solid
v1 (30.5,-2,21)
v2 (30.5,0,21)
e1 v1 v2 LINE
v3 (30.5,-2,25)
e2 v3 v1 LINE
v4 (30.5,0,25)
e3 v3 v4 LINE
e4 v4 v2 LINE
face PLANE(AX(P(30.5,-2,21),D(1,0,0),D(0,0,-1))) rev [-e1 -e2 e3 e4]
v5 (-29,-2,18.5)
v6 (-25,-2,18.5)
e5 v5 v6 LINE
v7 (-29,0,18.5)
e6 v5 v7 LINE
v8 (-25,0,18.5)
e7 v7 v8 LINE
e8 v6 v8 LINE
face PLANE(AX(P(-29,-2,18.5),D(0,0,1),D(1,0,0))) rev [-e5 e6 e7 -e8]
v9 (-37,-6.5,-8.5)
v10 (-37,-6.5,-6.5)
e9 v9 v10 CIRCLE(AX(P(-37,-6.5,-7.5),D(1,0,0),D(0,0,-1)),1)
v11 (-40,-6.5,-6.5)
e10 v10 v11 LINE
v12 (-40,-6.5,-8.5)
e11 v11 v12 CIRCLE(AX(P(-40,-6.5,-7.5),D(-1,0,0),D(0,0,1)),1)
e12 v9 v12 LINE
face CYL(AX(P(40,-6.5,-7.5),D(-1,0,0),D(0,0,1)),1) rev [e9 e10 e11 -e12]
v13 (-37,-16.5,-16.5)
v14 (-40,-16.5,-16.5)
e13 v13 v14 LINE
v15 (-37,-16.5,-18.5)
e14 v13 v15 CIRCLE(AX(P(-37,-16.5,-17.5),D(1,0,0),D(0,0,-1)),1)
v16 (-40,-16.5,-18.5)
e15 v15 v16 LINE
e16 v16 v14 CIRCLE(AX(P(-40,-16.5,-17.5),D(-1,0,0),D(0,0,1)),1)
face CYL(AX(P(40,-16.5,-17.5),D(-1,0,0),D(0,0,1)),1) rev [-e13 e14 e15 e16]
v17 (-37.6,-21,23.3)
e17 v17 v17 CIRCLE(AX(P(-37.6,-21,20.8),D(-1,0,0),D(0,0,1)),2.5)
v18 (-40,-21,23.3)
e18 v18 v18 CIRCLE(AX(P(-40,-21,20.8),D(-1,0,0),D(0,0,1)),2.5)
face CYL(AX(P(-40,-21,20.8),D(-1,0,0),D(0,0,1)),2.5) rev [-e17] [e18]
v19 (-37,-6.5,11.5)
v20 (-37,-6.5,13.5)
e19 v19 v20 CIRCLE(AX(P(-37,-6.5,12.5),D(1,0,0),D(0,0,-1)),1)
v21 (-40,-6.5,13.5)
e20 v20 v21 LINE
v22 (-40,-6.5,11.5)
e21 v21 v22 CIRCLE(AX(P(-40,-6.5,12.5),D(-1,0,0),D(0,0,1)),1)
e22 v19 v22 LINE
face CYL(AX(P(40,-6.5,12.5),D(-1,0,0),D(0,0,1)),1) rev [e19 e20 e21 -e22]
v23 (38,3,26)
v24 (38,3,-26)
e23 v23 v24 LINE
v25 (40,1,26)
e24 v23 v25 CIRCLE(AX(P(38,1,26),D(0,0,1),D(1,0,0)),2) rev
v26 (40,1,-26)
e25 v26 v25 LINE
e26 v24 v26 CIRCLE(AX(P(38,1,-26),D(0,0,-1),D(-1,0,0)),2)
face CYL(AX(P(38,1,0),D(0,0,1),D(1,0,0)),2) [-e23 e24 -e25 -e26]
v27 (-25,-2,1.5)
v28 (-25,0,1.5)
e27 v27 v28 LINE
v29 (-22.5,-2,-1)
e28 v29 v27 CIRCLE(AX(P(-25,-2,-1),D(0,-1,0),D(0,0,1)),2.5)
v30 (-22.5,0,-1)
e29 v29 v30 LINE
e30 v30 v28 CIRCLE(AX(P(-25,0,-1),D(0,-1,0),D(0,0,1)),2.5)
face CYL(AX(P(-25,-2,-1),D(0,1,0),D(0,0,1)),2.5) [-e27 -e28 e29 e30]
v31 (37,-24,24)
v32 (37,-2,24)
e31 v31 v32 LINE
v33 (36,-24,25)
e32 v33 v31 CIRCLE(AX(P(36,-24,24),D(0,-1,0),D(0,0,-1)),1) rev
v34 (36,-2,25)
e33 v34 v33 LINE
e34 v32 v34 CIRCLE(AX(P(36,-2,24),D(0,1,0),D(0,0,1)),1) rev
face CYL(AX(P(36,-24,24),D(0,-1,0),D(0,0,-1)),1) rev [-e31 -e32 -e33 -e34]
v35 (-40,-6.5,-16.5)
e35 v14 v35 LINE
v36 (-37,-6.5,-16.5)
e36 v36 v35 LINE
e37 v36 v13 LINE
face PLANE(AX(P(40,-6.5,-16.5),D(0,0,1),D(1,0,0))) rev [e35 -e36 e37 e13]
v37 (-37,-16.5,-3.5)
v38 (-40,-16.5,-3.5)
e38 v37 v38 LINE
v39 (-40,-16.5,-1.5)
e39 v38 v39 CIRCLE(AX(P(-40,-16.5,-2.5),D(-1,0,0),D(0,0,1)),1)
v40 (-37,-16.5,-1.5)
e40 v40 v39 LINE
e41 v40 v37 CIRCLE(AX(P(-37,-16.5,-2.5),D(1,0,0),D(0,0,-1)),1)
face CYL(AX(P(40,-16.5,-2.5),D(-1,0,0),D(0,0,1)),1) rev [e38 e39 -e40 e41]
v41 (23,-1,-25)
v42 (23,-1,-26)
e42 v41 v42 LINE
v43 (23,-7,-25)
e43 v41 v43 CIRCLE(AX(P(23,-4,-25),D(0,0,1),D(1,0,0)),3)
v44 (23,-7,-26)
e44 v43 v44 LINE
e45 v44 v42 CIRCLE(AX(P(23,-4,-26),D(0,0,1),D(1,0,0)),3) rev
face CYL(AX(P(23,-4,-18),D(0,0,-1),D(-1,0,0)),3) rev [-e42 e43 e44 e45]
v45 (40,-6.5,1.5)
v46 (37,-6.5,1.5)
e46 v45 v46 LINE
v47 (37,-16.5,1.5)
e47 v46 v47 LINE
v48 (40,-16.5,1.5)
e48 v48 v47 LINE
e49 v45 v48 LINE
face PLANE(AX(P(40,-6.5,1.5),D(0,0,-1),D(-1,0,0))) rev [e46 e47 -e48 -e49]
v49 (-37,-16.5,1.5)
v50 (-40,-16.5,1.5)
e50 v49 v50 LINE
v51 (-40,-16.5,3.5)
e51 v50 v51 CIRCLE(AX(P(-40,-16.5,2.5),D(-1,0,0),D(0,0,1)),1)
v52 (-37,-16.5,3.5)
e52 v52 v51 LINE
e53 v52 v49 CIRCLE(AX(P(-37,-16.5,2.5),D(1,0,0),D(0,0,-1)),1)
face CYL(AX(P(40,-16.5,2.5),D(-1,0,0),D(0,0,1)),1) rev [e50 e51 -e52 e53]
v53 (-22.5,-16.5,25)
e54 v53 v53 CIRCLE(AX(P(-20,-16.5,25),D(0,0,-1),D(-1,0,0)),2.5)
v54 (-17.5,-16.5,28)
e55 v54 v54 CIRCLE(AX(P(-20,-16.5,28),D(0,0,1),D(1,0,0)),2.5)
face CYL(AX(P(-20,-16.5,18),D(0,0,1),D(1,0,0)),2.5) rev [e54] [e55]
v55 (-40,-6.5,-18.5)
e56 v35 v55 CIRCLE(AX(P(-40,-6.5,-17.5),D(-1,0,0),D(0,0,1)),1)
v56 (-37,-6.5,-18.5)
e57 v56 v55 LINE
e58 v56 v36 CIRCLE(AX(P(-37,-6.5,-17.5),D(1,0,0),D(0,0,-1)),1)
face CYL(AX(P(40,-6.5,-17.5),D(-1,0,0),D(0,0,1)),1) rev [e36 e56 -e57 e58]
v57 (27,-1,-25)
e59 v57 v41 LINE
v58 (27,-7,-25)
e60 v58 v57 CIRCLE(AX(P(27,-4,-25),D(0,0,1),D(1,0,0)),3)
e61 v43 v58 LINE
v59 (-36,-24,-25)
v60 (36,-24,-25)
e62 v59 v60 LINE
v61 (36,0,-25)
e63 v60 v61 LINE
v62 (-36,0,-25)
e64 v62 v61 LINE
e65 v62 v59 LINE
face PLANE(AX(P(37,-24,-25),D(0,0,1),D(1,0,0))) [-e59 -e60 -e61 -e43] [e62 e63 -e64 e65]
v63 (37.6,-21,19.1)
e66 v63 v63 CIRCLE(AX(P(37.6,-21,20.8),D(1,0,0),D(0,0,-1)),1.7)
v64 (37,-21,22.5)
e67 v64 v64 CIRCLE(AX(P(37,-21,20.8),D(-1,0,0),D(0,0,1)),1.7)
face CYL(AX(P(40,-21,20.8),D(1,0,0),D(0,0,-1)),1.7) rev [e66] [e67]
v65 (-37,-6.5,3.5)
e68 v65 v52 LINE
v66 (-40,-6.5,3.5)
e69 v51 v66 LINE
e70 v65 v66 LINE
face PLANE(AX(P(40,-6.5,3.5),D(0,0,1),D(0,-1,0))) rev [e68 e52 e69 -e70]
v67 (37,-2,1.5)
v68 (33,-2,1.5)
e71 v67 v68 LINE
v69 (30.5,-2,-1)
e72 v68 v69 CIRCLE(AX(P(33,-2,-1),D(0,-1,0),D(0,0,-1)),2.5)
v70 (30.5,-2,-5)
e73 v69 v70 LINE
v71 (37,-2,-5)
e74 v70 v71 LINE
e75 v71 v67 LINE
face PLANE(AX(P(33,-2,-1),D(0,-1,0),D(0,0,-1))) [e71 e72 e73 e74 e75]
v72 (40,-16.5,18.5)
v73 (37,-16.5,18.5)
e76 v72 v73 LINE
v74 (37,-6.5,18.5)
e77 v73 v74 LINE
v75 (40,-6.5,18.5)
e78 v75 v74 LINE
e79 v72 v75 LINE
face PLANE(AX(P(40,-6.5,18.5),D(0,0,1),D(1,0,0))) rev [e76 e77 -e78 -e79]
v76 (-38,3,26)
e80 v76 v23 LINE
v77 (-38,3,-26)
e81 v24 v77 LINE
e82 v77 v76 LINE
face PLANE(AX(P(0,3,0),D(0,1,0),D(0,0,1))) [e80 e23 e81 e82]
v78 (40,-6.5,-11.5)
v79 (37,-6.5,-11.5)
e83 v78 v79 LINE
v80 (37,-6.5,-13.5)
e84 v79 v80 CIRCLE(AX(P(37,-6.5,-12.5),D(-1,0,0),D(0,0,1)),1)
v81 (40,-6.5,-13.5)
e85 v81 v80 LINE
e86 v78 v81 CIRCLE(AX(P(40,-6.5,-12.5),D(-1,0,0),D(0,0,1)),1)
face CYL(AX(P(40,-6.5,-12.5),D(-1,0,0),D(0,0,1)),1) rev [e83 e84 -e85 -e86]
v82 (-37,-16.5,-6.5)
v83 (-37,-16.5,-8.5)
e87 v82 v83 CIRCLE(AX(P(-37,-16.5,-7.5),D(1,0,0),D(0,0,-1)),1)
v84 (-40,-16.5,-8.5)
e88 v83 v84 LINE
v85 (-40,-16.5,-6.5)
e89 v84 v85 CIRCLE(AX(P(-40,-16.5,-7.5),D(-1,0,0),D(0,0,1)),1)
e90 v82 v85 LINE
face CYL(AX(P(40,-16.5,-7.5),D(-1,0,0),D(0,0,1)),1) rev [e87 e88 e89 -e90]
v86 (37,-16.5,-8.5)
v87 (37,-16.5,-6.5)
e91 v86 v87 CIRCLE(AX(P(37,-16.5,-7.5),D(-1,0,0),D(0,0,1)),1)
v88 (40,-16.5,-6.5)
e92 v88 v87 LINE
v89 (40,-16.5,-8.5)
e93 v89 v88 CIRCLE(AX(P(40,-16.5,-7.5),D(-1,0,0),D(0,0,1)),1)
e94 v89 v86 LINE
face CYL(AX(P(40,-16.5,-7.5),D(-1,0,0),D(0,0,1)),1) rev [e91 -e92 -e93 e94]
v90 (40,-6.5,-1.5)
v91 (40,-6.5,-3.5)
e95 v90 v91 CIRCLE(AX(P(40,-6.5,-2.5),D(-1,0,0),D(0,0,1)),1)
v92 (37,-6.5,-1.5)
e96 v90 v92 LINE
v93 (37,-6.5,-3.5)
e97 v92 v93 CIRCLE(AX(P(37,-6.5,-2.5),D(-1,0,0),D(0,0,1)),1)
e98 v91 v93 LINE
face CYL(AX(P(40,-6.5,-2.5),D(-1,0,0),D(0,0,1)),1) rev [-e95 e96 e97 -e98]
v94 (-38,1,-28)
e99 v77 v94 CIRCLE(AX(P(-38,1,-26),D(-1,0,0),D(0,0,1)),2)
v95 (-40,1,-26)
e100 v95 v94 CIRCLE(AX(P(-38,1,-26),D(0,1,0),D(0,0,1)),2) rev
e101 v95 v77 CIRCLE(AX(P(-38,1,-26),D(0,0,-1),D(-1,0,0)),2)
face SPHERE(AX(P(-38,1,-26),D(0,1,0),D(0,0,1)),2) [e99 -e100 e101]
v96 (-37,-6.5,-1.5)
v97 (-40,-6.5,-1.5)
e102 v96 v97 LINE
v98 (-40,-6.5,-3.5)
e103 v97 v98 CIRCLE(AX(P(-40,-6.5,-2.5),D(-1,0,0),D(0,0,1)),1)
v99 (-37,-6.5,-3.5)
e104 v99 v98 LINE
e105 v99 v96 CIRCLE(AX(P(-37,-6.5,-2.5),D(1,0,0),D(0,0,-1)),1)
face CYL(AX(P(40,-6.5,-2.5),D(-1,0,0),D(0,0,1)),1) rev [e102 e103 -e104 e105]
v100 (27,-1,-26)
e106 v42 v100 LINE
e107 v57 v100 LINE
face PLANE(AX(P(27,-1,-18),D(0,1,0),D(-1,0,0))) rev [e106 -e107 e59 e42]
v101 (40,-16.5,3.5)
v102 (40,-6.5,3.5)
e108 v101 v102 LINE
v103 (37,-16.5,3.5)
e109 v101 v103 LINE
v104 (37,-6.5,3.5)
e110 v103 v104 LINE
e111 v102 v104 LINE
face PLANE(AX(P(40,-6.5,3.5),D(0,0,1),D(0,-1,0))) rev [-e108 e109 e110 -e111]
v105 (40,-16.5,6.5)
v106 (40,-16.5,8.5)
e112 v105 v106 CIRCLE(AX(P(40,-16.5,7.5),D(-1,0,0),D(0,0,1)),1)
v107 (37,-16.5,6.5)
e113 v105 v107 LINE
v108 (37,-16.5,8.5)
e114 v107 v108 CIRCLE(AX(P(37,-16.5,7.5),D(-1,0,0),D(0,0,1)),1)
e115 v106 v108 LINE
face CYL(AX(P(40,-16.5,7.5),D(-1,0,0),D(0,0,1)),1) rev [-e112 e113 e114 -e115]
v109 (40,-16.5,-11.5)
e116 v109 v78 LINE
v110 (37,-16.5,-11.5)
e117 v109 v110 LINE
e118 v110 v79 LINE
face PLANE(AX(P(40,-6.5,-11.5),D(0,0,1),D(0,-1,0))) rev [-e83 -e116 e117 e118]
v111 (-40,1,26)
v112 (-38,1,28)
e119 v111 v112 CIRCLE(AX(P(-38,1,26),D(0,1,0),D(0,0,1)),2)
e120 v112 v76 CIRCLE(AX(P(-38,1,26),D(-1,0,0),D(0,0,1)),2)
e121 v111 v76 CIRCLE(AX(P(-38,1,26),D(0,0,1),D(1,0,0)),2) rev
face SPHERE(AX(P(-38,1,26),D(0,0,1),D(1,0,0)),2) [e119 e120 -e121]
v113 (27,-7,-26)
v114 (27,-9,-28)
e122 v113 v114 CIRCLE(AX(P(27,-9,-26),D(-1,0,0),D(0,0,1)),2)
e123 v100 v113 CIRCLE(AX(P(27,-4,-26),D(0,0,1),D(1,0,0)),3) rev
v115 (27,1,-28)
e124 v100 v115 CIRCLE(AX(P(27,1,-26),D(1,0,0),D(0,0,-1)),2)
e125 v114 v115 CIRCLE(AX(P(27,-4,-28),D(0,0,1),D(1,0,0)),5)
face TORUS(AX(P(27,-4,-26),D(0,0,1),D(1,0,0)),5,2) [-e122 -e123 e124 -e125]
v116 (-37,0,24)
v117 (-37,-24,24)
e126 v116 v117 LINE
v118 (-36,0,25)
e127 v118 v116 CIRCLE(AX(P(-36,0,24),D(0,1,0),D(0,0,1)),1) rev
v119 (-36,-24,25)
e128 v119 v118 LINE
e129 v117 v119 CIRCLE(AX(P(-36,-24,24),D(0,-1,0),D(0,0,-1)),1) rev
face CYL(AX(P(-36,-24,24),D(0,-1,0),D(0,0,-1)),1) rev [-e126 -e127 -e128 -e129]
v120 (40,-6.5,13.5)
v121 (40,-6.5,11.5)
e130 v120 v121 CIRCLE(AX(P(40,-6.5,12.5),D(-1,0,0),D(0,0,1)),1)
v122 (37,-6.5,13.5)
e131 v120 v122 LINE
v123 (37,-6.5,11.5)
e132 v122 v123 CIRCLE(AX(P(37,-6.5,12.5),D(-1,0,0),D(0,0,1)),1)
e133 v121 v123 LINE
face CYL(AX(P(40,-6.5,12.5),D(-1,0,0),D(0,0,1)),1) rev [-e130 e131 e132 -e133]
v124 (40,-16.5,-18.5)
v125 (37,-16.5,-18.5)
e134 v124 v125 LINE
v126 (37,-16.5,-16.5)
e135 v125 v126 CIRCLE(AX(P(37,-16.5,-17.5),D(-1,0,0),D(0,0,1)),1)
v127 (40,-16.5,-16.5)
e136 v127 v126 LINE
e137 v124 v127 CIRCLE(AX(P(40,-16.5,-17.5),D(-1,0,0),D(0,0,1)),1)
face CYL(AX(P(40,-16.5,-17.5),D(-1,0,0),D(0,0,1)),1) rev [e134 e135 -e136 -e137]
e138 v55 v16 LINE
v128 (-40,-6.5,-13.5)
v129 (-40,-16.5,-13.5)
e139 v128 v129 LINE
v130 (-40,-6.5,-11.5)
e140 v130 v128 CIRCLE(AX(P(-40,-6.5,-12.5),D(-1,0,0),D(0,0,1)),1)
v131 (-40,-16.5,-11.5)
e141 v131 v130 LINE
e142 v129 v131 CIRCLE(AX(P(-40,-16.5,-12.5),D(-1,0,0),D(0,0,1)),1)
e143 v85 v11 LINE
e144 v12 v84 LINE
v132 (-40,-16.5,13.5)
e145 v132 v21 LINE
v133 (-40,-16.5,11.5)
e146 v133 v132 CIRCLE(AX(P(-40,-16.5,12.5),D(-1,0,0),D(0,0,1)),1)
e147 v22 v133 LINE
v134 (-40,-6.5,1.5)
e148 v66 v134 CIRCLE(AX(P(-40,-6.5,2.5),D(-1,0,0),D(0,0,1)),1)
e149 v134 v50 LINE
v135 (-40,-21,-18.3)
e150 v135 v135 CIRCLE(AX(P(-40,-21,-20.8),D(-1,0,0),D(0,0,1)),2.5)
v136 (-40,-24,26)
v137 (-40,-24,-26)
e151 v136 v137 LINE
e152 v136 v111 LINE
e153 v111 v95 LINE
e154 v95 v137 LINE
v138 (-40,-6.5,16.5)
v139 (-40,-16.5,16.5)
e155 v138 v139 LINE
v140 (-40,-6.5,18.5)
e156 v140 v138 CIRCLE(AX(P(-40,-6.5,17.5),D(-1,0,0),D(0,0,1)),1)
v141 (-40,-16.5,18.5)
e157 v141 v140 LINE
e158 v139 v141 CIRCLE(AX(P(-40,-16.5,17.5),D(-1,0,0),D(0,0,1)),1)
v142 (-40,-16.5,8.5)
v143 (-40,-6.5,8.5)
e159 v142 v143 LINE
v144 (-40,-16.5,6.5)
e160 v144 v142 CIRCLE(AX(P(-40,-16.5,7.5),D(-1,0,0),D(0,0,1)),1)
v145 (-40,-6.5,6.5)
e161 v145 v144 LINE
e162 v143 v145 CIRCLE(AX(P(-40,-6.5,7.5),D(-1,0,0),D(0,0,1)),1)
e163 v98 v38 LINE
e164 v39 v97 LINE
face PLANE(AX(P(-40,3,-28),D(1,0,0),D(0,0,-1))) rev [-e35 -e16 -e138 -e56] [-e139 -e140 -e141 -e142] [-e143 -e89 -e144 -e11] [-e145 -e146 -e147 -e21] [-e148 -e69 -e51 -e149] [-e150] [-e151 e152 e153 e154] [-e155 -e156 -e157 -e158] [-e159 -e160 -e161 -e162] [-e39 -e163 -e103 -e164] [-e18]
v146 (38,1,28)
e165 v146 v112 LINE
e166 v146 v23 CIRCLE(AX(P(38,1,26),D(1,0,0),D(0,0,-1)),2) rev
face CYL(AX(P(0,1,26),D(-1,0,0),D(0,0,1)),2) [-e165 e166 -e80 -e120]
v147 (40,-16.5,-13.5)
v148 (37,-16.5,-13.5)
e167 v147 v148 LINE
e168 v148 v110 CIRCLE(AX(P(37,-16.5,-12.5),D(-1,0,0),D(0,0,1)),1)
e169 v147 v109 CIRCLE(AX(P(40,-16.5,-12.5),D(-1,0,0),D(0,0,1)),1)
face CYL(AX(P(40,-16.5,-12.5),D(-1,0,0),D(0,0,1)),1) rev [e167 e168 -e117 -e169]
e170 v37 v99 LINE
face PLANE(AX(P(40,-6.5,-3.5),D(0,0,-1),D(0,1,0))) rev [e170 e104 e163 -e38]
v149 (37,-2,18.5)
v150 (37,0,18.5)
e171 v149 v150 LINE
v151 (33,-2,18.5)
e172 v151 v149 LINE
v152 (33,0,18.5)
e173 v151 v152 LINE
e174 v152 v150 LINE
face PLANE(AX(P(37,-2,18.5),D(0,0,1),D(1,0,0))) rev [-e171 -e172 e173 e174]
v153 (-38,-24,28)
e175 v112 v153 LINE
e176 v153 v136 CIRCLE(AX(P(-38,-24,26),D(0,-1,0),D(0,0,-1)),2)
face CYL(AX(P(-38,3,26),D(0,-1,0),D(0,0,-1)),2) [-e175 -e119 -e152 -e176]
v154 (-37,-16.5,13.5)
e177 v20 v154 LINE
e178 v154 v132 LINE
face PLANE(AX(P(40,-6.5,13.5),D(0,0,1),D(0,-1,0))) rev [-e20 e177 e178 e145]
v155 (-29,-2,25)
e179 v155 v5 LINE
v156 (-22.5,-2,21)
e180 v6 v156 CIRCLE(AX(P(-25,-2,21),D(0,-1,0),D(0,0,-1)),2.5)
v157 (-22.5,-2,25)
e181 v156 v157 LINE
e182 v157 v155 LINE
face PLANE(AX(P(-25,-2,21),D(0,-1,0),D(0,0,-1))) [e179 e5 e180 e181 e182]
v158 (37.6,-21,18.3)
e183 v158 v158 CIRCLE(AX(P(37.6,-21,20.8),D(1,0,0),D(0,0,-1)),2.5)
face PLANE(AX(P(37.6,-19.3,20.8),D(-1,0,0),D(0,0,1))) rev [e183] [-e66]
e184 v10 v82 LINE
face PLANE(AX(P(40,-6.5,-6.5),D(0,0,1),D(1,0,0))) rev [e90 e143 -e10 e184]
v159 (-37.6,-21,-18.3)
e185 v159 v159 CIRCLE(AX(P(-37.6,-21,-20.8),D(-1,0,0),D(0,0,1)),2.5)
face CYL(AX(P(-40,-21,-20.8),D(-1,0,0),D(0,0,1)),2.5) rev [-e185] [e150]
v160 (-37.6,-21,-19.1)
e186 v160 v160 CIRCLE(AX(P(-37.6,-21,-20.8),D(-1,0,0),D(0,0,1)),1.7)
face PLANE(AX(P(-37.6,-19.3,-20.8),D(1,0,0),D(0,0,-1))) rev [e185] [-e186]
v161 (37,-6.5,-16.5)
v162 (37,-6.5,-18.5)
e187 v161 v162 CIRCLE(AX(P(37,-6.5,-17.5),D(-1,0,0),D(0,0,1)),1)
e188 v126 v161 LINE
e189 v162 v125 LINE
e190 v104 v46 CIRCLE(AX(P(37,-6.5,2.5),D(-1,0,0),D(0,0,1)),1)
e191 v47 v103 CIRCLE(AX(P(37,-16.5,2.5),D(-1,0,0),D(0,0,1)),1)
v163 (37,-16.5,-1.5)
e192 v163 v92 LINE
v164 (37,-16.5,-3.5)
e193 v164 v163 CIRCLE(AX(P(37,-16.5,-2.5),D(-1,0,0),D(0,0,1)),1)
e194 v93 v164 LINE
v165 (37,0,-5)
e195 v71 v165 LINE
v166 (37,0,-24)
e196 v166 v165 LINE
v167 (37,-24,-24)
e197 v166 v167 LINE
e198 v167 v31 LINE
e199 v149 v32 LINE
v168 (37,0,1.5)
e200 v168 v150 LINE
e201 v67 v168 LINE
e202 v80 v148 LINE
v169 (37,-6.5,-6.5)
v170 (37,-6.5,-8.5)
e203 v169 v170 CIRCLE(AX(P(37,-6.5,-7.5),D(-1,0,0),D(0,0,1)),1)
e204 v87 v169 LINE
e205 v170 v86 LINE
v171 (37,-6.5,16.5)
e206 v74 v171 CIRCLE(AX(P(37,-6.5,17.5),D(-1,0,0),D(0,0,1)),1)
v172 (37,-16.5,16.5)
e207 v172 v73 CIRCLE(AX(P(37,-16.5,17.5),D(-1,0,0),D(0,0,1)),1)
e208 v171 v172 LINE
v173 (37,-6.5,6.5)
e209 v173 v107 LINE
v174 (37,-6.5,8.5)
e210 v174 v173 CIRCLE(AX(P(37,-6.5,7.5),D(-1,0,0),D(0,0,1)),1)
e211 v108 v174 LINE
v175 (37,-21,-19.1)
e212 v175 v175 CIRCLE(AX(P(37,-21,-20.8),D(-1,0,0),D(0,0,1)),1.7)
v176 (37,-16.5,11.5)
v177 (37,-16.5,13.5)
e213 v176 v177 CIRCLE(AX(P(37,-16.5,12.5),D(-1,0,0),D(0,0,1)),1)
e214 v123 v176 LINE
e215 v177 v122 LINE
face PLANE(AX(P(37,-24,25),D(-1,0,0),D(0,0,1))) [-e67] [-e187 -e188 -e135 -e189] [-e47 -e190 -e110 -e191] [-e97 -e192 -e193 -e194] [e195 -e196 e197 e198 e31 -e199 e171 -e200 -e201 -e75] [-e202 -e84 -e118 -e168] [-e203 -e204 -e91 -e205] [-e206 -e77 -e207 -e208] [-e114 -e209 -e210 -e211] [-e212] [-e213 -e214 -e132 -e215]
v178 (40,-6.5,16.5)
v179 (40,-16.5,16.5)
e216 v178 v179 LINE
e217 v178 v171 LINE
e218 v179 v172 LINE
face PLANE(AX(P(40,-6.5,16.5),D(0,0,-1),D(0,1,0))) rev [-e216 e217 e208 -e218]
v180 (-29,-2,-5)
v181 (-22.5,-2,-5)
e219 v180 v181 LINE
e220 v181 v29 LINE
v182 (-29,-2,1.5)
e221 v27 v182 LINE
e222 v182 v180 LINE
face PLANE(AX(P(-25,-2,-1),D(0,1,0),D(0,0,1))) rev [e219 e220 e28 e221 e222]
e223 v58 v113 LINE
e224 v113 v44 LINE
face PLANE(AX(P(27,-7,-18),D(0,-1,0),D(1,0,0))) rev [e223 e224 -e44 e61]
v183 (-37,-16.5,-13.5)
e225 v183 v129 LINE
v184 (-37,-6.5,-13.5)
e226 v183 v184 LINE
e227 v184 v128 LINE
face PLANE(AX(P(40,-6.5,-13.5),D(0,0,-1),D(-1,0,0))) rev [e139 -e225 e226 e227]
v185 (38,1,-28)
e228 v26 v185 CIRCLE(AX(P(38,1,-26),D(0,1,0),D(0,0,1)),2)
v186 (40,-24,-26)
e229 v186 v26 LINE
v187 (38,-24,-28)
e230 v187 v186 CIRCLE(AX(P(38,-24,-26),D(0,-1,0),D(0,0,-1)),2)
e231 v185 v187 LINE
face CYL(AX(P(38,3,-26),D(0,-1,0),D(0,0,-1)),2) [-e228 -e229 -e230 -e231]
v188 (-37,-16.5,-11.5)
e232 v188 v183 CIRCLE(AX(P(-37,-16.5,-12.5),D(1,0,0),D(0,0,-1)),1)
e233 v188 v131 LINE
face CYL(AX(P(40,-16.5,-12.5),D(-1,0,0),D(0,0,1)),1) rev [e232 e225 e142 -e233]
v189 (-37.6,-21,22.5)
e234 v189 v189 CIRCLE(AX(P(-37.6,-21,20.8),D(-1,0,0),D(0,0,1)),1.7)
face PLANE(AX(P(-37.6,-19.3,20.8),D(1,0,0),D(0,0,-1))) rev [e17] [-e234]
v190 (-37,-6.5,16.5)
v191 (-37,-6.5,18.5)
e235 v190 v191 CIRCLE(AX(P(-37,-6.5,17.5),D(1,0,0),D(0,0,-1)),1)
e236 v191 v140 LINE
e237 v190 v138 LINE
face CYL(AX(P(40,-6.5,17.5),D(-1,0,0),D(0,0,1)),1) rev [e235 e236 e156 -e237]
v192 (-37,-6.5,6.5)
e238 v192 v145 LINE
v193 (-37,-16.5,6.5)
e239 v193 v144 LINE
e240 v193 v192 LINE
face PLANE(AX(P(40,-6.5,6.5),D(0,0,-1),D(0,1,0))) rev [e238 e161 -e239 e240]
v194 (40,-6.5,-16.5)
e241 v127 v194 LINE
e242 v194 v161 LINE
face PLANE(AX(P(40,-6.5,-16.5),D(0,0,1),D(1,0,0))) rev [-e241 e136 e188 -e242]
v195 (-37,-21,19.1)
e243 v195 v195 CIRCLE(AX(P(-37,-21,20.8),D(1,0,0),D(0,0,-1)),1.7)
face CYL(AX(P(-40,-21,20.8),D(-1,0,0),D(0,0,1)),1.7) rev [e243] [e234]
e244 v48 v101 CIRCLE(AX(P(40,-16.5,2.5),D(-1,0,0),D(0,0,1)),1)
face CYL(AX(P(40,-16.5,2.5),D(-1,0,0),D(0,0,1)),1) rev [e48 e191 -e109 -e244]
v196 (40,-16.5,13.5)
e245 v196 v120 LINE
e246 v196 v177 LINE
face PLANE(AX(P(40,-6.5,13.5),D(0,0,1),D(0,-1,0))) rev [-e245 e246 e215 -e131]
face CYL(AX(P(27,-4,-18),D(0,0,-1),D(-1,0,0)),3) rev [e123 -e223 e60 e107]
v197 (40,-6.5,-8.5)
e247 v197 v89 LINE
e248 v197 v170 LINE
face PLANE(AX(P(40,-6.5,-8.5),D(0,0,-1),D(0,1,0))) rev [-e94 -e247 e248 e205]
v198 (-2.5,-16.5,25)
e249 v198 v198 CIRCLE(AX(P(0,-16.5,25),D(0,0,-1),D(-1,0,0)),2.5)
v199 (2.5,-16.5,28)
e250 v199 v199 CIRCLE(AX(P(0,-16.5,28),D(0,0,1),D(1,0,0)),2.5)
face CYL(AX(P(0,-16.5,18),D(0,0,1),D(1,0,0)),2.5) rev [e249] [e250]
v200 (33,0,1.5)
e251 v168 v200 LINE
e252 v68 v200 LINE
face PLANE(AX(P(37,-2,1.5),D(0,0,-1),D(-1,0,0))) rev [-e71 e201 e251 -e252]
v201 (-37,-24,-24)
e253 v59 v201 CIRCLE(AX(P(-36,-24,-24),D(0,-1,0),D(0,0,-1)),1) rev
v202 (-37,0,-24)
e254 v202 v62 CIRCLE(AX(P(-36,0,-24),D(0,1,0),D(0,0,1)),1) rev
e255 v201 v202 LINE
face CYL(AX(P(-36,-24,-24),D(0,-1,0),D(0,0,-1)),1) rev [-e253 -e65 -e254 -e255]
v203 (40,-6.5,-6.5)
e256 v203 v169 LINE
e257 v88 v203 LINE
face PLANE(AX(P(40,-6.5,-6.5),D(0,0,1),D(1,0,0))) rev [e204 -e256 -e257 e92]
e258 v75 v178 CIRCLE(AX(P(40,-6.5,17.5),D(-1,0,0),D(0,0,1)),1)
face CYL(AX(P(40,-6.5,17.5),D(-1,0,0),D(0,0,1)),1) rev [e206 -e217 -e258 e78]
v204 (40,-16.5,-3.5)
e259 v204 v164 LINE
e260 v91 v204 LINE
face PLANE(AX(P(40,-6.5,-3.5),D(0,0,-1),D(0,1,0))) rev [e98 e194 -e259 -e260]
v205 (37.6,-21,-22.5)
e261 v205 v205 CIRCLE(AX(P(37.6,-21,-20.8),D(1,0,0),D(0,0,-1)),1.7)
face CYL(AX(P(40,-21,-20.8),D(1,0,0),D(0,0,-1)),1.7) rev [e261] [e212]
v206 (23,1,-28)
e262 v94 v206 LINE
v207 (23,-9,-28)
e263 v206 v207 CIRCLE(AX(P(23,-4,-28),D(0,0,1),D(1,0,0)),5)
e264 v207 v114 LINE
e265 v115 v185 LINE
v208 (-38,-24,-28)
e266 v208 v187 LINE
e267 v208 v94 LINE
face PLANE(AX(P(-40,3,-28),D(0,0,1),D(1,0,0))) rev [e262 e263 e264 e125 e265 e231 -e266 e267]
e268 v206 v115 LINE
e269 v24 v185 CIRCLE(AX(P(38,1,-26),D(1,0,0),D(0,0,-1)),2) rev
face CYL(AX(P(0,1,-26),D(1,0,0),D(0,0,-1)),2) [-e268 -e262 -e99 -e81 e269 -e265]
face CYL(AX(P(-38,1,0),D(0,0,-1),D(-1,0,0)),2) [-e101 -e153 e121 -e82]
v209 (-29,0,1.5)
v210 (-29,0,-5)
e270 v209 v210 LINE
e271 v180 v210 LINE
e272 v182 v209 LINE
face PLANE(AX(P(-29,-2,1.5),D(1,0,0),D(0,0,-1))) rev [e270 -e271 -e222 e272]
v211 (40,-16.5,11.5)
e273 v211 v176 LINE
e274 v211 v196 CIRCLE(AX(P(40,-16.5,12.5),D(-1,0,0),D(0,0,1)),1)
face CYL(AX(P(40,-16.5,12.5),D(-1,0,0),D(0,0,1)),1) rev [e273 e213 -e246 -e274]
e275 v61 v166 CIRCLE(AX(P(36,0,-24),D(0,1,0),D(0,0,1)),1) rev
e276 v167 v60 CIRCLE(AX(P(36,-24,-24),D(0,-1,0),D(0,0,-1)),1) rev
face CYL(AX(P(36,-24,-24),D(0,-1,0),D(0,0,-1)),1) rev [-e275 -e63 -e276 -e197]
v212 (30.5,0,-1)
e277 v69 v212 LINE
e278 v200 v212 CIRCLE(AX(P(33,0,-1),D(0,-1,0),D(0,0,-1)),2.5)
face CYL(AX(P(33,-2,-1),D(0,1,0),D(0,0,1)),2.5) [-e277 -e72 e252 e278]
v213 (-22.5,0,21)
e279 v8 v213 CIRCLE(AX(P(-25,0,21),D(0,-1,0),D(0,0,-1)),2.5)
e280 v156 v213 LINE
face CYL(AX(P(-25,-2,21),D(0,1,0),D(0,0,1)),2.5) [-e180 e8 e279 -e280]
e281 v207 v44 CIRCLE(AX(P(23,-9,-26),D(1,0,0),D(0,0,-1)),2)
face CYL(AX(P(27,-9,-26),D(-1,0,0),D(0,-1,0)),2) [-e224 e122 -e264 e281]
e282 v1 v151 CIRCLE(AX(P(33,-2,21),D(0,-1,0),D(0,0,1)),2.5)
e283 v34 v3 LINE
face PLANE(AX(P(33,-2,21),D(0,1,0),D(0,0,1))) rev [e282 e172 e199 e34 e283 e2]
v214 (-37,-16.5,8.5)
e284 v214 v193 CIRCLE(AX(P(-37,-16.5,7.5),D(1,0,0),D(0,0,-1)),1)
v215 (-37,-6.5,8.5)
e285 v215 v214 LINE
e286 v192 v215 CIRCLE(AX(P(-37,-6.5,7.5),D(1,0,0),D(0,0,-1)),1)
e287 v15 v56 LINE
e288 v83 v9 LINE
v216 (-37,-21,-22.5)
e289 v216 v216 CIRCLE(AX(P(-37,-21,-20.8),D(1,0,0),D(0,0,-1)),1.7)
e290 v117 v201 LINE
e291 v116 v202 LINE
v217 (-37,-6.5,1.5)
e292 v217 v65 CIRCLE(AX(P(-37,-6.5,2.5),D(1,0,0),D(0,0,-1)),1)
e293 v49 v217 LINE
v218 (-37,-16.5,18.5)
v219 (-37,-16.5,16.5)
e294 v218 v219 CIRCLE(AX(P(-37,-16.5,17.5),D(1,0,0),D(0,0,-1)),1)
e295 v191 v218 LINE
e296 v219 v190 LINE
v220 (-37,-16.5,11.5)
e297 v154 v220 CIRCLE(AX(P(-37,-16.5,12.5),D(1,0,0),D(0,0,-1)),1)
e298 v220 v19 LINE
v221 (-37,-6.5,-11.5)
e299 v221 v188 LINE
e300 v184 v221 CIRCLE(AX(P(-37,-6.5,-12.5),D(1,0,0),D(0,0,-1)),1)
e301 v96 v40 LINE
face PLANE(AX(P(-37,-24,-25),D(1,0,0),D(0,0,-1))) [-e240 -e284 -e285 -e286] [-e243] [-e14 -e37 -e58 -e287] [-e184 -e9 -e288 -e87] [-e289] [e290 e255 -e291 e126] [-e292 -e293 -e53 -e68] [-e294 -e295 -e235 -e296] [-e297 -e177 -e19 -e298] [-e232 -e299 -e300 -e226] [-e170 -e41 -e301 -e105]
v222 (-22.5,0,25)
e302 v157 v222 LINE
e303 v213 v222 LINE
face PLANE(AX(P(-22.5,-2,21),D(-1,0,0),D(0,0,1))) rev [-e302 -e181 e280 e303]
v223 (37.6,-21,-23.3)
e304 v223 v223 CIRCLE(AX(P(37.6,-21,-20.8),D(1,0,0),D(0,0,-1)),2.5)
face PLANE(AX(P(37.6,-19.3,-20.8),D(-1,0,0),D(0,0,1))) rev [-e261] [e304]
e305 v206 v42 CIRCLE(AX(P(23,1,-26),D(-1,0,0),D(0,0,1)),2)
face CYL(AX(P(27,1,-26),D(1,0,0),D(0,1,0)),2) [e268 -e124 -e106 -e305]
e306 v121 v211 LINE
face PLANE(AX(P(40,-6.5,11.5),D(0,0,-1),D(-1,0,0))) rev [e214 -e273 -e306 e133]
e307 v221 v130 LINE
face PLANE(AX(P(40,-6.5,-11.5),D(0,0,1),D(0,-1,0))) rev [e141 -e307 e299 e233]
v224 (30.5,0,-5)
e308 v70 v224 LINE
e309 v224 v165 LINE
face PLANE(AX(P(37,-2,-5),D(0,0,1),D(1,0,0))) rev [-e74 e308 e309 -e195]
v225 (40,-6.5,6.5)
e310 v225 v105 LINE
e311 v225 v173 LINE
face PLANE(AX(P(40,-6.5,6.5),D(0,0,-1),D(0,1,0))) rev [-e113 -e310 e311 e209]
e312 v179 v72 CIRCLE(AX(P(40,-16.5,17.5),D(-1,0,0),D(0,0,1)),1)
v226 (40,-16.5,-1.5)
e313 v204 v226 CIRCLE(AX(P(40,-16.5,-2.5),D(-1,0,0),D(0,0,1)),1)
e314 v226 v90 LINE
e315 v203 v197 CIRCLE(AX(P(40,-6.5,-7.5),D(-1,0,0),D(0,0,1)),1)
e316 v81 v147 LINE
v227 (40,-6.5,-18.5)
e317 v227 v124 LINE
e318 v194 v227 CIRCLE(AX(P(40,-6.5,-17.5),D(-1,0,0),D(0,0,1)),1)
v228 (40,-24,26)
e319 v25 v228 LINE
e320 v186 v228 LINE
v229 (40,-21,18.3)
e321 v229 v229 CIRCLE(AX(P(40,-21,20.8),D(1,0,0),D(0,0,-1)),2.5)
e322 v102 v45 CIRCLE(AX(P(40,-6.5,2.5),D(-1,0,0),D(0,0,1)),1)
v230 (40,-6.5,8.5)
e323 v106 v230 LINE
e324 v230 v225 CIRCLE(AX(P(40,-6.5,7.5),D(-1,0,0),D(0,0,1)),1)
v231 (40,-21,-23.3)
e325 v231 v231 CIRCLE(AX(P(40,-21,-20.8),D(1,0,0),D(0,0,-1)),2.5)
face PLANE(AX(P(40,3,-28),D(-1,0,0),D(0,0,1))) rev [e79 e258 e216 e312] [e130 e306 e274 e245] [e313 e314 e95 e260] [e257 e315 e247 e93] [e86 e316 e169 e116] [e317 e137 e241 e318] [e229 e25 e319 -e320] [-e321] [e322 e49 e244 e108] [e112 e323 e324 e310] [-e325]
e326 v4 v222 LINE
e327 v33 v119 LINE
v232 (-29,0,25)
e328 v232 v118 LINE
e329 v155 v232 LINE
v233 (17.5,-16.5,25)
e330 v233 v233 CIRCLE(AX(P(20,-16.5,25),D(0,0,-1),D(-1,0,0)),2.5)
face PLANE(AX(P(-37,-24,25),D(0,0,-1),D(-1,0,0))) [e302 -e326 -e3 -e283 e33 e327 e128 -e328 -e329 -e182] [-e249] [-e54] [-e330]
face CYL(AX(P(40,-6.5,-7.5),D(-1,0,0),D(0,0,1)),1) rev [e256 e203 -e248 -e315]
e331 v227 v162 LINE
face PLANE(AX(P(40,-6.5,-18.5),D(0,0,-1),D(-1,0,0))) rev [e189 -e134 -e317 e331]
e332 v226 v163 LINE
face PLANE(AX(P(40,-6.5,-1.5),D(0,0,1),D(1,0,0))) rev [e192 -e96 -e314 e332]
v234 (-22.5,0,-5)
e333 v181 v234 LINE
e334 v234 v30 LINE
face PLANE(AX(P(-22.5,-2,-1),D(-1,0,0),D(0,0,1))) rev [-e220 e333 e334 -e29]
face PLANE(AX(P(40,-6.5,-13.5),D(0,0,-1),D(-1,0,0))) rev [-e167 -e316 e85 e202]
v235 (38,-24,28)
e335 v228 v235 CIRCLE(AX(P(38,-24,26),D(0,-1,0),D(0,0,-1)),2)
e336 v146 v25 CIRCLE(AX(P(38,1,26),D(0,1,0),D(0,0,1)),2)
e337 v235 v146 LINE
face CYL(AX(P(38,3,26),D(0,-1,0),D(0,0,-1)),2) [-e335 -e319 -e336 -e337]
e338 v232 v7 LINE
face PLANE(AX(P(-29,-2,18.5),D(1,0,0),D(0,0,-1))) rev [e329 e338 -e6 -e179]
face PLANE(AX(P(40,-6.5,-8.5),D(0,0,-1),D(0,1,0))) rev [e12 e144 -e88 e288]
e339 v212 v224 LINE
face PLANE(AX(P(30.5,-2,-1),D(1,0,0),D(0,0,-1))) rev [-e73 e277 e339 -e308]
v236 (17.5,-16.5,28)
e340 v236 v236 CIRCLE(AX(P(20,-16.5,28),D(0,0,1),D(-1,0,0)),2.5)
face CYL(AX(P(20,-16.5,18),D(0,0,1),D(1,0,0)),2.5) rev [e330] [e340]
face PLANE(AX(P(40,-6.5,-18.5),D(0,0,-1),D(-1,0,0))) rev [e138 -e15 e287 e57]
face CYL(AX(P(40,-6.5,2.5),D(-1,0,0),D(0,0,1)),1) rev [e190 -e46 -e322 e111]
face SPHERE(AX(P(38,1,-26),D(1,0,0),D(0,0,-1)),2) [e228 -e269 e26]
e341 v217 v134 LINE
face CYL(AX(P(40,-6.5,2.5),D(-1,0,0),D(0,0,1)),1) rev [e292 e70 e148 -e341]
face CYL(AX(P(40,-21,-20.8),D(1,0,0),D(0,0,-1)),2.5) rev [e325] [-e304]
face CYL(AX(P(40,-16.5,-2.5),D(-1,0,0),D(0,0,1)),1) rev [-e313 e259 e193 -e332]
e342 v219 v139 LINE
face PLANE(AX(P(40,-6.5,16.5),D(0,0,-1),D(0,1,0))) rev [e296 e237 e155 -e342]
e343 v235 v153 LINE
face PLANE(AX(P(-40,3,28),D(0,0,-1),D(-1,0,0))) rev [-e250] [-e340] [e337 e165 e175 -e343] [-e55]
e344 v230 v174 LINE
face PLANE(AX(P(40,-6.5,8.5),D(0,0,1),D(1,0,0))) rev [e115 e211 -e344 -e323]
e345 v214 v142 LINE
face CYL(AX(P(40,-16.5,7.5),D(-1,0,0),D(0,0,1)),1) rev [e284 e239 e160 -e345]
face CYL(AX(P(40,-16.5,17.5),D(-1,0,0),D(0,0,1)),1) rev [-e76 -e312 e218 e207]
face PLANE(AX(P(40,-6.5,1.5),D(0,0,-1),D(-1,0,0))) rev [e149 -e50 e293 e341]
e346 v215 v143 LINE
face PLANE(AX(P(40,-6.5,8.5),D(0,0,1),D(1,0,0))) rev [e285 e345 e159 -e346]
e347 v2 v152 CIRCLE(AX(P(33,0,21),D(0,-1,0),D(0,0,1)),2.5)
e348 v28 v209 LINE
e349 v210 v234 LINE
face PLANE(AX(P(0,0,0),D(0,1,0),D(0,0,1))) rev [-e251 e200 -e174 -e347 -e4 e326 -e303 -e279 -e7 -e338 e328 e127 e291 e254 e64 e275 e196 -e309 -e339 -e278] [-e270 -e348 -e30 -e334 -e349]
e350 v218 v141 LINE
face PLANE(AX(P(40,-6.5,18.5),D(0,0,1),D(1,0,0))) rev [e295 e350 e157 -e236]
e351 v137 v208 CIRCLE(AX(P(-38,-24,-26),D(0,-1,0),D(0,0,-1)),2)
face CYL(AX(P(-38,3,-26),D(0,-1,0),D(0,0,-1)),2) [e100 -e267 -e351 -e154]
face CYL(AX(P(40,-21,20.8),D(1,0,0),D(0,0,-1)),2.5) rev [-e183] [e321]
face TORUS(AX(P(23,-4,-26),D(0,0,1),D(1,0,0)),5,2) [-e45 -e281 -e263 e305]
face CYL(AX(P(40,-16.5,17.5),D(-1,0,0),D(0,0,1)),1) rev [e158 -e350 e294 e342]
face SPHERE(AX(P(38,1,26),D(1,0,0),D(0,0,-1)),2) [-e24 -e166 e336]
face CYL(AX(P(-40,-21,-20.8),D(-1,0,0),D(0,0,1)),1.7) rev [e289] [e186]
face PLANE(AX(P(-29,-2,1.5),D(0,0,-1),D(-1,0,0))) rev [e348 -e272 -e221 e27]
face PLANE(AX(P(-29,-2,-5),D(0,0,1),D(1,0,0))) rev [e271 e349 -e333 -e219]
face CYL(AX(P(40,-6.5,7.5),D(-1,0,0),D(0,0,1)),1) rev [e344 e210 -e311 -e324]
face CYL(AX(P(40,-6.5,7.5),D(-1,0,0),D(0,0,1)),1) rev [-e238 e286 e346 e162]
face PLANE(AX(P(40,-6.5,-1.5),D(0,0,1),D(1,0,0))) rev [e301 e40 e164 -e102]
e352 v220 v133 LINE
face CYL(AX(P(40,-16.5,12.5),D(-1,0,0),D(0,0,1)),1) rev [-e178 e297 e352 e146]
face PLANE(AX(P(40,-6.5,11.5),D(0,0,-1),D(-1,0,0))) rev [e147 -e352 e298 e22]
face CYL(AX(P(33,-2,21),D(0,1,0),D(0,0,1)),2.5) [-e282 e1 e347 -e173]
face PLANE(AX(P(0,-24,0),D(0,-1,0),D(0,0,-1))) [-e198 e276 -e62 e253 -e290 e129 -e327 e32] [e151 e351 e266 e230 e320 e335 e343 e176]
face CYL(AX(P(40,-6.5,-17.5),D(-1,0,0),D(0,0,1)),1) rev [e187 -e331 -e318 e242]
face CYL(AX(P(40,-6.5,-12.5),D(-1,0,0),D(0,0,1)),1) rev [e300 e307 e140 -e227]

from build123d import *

# Parameters (mm, degrees)
SKETCH1_W                                    = 80
SKETCH1_H                                    = 56
BOSS_EXTRUDE1_DEPTH                          = 3
SKETCH2_W                                    = 74
SKETCH2_H                                    = 50
BOSS_EXTRUDE2_DEPTH                          = 24
FILLET1_R                                    = 1
FILLET2_R                                    = 2
SKETCH3_R                                    = 2.5
CUT_EXTRUDE1_DEPTH                           = 10
CUT_EXTRUDE2_DEPTH                           = 10
FILLET3_R                                    = 2
BOSS_EXTRUDE3_DEPTH                          = 2
CUT_EXTRUDE3_DEPTH                           = 89.090862182
CBORE_FOR_M3_CROSS_RECESS_PAN_HEAD_S_2_COUNT = 2
CBORE_FOR_M3_CROSS_RECESS_PAN_HEAD_S_2_PITCH = 15.207328374
CBORE_FOR_M3_CROSS_RECESS_PAN_HEAD_S_3_COUNT = 2
CBORE_FOR_M3_CROSS_RECESS_PAN_HEAD_S_3_PITCH = 14.900401376


with BuildPart() as part:
    # Sketch1 → Boss-Extrude1 (new body)
    with BuildSketch(Plane(origin=(0, 0, 0), x_dir=(1, 0, 0), z_dir=(0, 1, 0))):
        Rectangle(SKETCH1_W, SKETCH1_H)
    extrude(amount=BOSS_EXTRUDE1_DEPTH)

    # Sketch2 → Boss-Extrude2 (add)
    with BuildSketch(Plane.XZ):
        Polygon((37, -28), (-37, -28), (-40, -28), (-40, 28), (40, 28), (40, -28), align=None)
        Rectangle(SKETCH2_W, SKETCH2_H, mode=Mode.SUBTRACT)
    extrude(amount=BOSS_EXTRUDE2_DEPTH)

    # Fillet1
    fillet1_edges = [part.edges().sort_by_distance(p)[0] for p in [
        (-37, -12, -25),
        (37, -12, -25),
        (37, -12, 25),
        (-37, -12, 25),
    ]]
    fillet(fillet1_edges, radius=FILLET1_R)

    # Fillet2
    fillet2_edges = [part.edges().sort_by_distance(p)[0] for p in [
        (-40, 3, 0),
        (0, 3, 28),
        (40, 3, 0),
        (40, -10.5, 28),
        (-40, -10.5, 28),
        (-40, -10.5, -28),
        (40, -10.5, -28),
        (0, 3, -28),
    ]]
    fillet(fillet2_edges, radius=FILLET2_R)

    # Sketch3 → Cut-Extrude1 (cut)
    with BuildSketch(Plane.XY.offset(28)):
        with Locations((0, -16.5)):
            Circle(SKETCH3_R)
        with Locations((-20, -16.5)):
            Circle(SKETCH3_R)
        with Locations(Location((20, -16.5, 0), (0, 0, 180))):
            Circle(SKETCH3_R)
    extrude(amount=-CUT_EXTRUDE1_DEPTH, mode=Mode.SUBTRACT)

    # Sketch5 → Cut-Extrude2 (cut)
    with BuildSketch(Plane(origin=(0, 0, -28), x_dir=(-1, 0, 0), z_dir=(0, 0, -1))):
        with BuildLine():
            Line((-27, -1), (-23, -1))
            ThreePointArc((-23, -1), (-20, -4), (-23, -7))
            Line((-23, -7), (-27, -7))
            ThreePointArc((-27, -7), (-30, -4), (-27, -1))
        make_face()
    extrude(amount=-CUT_EXTRUDE2_DEPTH, mode=Mode.SUBTRACT)

    # Fillet3
    fillet3_edges = [part.edges().sort_by_distance(p)[0] for p in [
        (30, -4, -28),
        (25, -7, -28),
        (20, -4, -28),
        (25, -1, -28),
    ]]
    fillet(fillet3_edges, radius=FILLET3_R - 0.0001)  # a hair under: the kernel refuses the full size

    # Sketch6 → Boss-Extrude3 (add)
    with BuildSketch(Plane.XZ):
        with BuildLine():
            Line((37, 18.5), (33, 18.5))
            ThreePointArc((33, 18.5), (31.232233047, 19.232233047), (30.5, 21))
            Line((30.5, 21), (30.5, 25))
            Line((30.5, 25), (37, 25))
            Line((37, 25), (37, 18.5))
        make_face()
        with BuildLine():
            Line((37, -5), (30.5, -5))
            Line((30.5, -5), (30.5, -1))
            ThreePointArc((30.5, -1), (31.232233047, 0.767766953), (33, 1.5))
            Line((33, 1.5), (37, 1.5))
            Line((37, 1.5), (37, -5))
        make_face()
        with BuildLine():
            Line((-29, 1.5), (-25, 1.5))
            ThreePointArc((-25, 1.5), (-23.232233047, 0.767766953), (-22.5, -1))
            Line((-22.5, -1), (-22.5, -5))
            Line((-22.5, -5), (-29, -5))
            Line((-29, -5), (-29, 1.5))
        make_face()
        with BuildLine():
            Line((-29, 25), (-22.5, 25))
            Line((-22.5, 25), (-22.5, 21))
            ThreePointArc((-22.5, 21), (-23.232233047, 19.232233047), (-25, 18.5))
            Line((-25, 18.5), (-29, 18.5))
            Line((-29, 18.5), (-29, 25))
        make_face()
    extrude(amount=BOSS_EXTRUDE3_DEPTH)

    # Sketch7 → Cut-Extrude3 (cut, through all)
    with BuildSketch(Plane.ZY.offset(40)):
        with BuildLine():
            Line((-16.5, -6.5), (-16.5, -16.5))
            ThreePointArc((-16.5, -16.5), (-17.5, -17.5), (-18.5, -16.5))
            Line((-18.5, -16.5), (-18.5, -6.5))
            ThreePointArc((-18.5, -6.5), (-17.5, -5.5), (-16.5, -6.5))
        make_face()
        with BuildLine():
            Line((-11.5, -6.5), (-11.5, -16.5))
            ThreePointArc((-11.5, -16.5), (-12.5, -17.5), (-13.5, -16.5))
            Line((-13.5, -16.5), (-13.5, -6.5))
            ThreePointArc((-13.5, -6.5), (-12.5, -5.5), (-11.5, -6.5))
        make_face()
        with BuildLine():
            Line((-6.5, -6.5), (-6.5, -16.5))
            ThreePointArc((-6.5, -16.5), (-7.5, -17.5), (-8.5, -16.5))
            Line((-8.5, -16.5), (-8.5, -6.5))
            ThreePointArc((-8.5, -6.5), (-7.5, -5.5), (-6.5, -6.5))
        make_face()
        with BuildLine():
            Line((-1.5, -6.5), (-1.5, -16.5))
            ThreePointArc((-1.5, -16.5), (-2.5, -17.5), (-3.5, -16.5))
            Line((-3.5, -16.5), (-3.5, -6.5))
            ThreePointArc((-3.5, -6.5), (-2.5, -5.5), (-1.5, -6.5))
        make_face()
        with BuildLine():
            Line((3.5, -6.5), (3.5, -16.5))
            ThreePointArc((3.5, -16.5), (2.5, -17.5), (1.5, -16.5))
            Line((1.5, -16.5), (1.5, -6.5))
            ThreePointArc((1.5, -6.5), (2.5, -5.5), (3.5, -6.5))
        make_face()
        with BuildLine():
            Line((8.5, -6.5), (8.5, -16.5))
            ThreePointArc((8.5, -16.5), (7.5, -17.5), (6.5, -16.5))
            Line((6.5, -16.5), (6.5, -6.5))
            ThreePointArc((6.5, -6.5), (7.5, -5.5), (8.5, -6.5))
        make_face()
        with BuildLine():
            Line((13.5, -6.5), (13.5, -16.5))
            ThreePointArc((13.5, -16.5), (12.5, -17.5), (11.5, -16.5))
            Line((11.5, -16.5), (11.5, -6.5))
            ThreePointArc((11.5, -6.5), (12.5, -5.5), (13.5, -6.5))
        make_face()
        with BuildLine():
            Line((18.5, -6.5), (18.5, -16.5))
            ThreePointArc((18.5, -16.5), (17.5, -17.5), (16.5, -16.5))
            Line((16.5, -16.5), (16.5, -6.5))
            ThreePointArc((16.5, -6.5), (17.5, -5.5), (18.5, -6.5))
        make_face()
    extrude(amount=-CUT_EXTRUDE3_DEPTH, mode=Mode.SUBTRACT)

    # Sketch9 → CBORE for M3 Cross Recess Pan Head Screw1 (revolve, cut)
    with BuildSketch(Plane(origin=(40, -21, -20.8), x_dir=(0, 0, -1), z_dir=(0, 1, 0))):
        Polygon((0, 0), (0, 3), (1.7, 3), (1.7, 2.4), (2.5, 2.4), (2.5, 0), align=None)
    cbore_for_m3_cross_recess_pan_head_screw = revolve(axis=Axis((46.35, -21, -20.8), (-1, 0, 0)), mode=Mode.SUBTRACT)

    # CBORE for M3 Cross Recess Pan Head S 2: CBORE for M3 Cross Recess Pan Head Screw1 ×2
    with Locations(*[Vector(0, -0.1073379095741248, -0.9942225973936909) * (i * CBORE_FOR_M3_CROSS_RECESS_PAN_HEAD_S_2_PITCH) for i in range(1, CBORE_FOR_M3_CROSS_RECESS_PAN_HEAD_S_2_COUNT)]):
        add(cbore_for_m3_cross_recess_pan_head_screw, mode=Mode.SUBTRACT)

    # CBORE for M3 Cross Recess Pan Head S 3: CBORE for M3 Cross Recess Pan Head Screw1 ×2
    with Locations(*[Vector(0, -0.0825685481728506, -0.9965853876375209) * (i * CBORE_FOR_M3_CROSS_RECESS_PAN_HEAD_S_3_PITCH) for i in range(1, CBORE_FOR_M3_CROSS_RECESS_PAN_HEAD_S_3_COUNT)]):
        add(cbore_for_m3_cross_recess_pan_head_screw, mode=Mode.SUBTRACT)

    # Mirror1: CBORE for M3 Cross Recess Pan Head Screw1 across plane
    add(cbore_for_m3_cross_recess_pan_head_screw.mirror(Plane.XY), mode=Mode.SUBTRACT)

    # Mirror1 copy 1 sketch → Mirror1 copy 1 (revolve, cut)
    with BuildSketch(Plane(origin=(40, -22.632322838, 35.919469515), x_dir=(0, 0, 1), z_dir=(0, 1, 0))):
        Polygon((0, 0), (0, -3), (1.7, -3), (1.7, -2.4), (2.5, -2.4), (2.5, 0), align=None)
    revolve(axis=Axis((46.35, -22.632322838, 35.919469515), (1, 0, 0)), mode=Mode.SUBTRACT)

    # Mirror1 copy 2 sketch → Mirror1 copy 2 (revolve, cut)
    with BuildSketch(Plane(origin=(40, -22.230304509, 35.649522281), x_dir=(0, 0, 1), z_dir=(0, 1, 0))):
        Polygon((0, 0), (0, -3), (1.7, -3), (1.7, -2.4), (2.5, -2.4), (2.5, 0), align=None)
    revolve(axis=Axis((46.35, -22.230304509, 35.649522281), (1, 0, 0)), mode=Mode.SUBTRACT)

    # Mirror2: CBORE for M3 Cross Recess Pan Head Screw1 across plane
    add(cbore_for_m3_cross_recess_pan_head_screw.mirror(Plane(origin=(0, 0, 0), x_dir=(0, 0, 1), z_dir=(1, 0, 0))), mode=Mode.SUBTRACT)

    # Mirror2 copy 1 sketch → Mirror2 copy 1 (revolve, cut)
    with BuildSketch(Plane(origin=(-40, -22.632322838, -35.919469515), x_dir=(0, 0, -1), z_dir=(0, 1, 0))):
        Polygon((0, 0), (0, -3), (1.7, -3), (1.7, -2.4), (2.5, -2.4), (2.5, 0), align=None)
    revolve(axis=Axis((-46.35, -22.632322838, -35.919469515), (-1, 0, 0)), mode=Mode.SUBTRACT)

    # Mirror2 copy 2 sketch → Mirror2 copy 2 (revolve, cut)
    with BuildSketch(Plane(origin=(-40, -22.230304509, -35.649522281), x_dir=(0, 0, -1), z_dir=(0, 1, 0))):
        Polygon((0, 0), (0, -3), (1.7, -3), (1.7, -2.4), (2.5, -2.4), (2.5, 0), align=None)
    revolve(axis=Axis((-46.35, -22.230304509, -35.649522281), (-1, 0, 0)), mode=Mode.SUBTRACT)

    # Mirror2 copy 3 sketch → Mirror2 copy 3 (revolve, cut)
    with BuildSketch(Plane(origin=(-40, -21, 20.8), x_dir=(0, 0, 1), z_dir=(0, 1, 0))):
        Polygon((0, 0), (0, 3), (1.7, 3), (1.7, 2.4), (2.5, 2.4), (2.5, 0), align=None)
    revolve(axis=Axis((-46.35, -21, 20.8), (1, 0, 0)), mode=Mode.SUBTRACT)

    # Mirror2 copy 4 sketch → Mirror2 copy 4 (revolve, cut)
    with BuildSketch(Plane(origin=(-40, -22.632322838, 35.919469515), x_dir=(0, 0, 1), z_dir=(0, 1, 0))):
        Polygon((0, 0), (0, 3), (1.7, 3), (1.7, 2.4), (2.5, 2.4), (2.5, 0), align=None)
    revolve(axis=Axis((-46.35, -22.632322838, 35.919469515), (1, 0, 0)), mode=Mode.SUBTRACT)

    # Mirror2 copy 5 sketch → Mirror2 copy 5 (revolve, cut)
    with BuildSketch(Plane(origin=(-40, -22.230304509, 35.649522281), x_dir=(0, 0, 1), z_dir=(0, 1, 0))):
        Polygon((0, 0), (0, 3), (1.7, 3), (1.7, 2.4), (2.5, 2.4), (2.5, 0), align=None)
    revolve(axis=Axis((-46.35, -22.230304509, 35.649522281), (1, 0, 0)), mode=Mode.SUBTRACT)


solid = part.part
